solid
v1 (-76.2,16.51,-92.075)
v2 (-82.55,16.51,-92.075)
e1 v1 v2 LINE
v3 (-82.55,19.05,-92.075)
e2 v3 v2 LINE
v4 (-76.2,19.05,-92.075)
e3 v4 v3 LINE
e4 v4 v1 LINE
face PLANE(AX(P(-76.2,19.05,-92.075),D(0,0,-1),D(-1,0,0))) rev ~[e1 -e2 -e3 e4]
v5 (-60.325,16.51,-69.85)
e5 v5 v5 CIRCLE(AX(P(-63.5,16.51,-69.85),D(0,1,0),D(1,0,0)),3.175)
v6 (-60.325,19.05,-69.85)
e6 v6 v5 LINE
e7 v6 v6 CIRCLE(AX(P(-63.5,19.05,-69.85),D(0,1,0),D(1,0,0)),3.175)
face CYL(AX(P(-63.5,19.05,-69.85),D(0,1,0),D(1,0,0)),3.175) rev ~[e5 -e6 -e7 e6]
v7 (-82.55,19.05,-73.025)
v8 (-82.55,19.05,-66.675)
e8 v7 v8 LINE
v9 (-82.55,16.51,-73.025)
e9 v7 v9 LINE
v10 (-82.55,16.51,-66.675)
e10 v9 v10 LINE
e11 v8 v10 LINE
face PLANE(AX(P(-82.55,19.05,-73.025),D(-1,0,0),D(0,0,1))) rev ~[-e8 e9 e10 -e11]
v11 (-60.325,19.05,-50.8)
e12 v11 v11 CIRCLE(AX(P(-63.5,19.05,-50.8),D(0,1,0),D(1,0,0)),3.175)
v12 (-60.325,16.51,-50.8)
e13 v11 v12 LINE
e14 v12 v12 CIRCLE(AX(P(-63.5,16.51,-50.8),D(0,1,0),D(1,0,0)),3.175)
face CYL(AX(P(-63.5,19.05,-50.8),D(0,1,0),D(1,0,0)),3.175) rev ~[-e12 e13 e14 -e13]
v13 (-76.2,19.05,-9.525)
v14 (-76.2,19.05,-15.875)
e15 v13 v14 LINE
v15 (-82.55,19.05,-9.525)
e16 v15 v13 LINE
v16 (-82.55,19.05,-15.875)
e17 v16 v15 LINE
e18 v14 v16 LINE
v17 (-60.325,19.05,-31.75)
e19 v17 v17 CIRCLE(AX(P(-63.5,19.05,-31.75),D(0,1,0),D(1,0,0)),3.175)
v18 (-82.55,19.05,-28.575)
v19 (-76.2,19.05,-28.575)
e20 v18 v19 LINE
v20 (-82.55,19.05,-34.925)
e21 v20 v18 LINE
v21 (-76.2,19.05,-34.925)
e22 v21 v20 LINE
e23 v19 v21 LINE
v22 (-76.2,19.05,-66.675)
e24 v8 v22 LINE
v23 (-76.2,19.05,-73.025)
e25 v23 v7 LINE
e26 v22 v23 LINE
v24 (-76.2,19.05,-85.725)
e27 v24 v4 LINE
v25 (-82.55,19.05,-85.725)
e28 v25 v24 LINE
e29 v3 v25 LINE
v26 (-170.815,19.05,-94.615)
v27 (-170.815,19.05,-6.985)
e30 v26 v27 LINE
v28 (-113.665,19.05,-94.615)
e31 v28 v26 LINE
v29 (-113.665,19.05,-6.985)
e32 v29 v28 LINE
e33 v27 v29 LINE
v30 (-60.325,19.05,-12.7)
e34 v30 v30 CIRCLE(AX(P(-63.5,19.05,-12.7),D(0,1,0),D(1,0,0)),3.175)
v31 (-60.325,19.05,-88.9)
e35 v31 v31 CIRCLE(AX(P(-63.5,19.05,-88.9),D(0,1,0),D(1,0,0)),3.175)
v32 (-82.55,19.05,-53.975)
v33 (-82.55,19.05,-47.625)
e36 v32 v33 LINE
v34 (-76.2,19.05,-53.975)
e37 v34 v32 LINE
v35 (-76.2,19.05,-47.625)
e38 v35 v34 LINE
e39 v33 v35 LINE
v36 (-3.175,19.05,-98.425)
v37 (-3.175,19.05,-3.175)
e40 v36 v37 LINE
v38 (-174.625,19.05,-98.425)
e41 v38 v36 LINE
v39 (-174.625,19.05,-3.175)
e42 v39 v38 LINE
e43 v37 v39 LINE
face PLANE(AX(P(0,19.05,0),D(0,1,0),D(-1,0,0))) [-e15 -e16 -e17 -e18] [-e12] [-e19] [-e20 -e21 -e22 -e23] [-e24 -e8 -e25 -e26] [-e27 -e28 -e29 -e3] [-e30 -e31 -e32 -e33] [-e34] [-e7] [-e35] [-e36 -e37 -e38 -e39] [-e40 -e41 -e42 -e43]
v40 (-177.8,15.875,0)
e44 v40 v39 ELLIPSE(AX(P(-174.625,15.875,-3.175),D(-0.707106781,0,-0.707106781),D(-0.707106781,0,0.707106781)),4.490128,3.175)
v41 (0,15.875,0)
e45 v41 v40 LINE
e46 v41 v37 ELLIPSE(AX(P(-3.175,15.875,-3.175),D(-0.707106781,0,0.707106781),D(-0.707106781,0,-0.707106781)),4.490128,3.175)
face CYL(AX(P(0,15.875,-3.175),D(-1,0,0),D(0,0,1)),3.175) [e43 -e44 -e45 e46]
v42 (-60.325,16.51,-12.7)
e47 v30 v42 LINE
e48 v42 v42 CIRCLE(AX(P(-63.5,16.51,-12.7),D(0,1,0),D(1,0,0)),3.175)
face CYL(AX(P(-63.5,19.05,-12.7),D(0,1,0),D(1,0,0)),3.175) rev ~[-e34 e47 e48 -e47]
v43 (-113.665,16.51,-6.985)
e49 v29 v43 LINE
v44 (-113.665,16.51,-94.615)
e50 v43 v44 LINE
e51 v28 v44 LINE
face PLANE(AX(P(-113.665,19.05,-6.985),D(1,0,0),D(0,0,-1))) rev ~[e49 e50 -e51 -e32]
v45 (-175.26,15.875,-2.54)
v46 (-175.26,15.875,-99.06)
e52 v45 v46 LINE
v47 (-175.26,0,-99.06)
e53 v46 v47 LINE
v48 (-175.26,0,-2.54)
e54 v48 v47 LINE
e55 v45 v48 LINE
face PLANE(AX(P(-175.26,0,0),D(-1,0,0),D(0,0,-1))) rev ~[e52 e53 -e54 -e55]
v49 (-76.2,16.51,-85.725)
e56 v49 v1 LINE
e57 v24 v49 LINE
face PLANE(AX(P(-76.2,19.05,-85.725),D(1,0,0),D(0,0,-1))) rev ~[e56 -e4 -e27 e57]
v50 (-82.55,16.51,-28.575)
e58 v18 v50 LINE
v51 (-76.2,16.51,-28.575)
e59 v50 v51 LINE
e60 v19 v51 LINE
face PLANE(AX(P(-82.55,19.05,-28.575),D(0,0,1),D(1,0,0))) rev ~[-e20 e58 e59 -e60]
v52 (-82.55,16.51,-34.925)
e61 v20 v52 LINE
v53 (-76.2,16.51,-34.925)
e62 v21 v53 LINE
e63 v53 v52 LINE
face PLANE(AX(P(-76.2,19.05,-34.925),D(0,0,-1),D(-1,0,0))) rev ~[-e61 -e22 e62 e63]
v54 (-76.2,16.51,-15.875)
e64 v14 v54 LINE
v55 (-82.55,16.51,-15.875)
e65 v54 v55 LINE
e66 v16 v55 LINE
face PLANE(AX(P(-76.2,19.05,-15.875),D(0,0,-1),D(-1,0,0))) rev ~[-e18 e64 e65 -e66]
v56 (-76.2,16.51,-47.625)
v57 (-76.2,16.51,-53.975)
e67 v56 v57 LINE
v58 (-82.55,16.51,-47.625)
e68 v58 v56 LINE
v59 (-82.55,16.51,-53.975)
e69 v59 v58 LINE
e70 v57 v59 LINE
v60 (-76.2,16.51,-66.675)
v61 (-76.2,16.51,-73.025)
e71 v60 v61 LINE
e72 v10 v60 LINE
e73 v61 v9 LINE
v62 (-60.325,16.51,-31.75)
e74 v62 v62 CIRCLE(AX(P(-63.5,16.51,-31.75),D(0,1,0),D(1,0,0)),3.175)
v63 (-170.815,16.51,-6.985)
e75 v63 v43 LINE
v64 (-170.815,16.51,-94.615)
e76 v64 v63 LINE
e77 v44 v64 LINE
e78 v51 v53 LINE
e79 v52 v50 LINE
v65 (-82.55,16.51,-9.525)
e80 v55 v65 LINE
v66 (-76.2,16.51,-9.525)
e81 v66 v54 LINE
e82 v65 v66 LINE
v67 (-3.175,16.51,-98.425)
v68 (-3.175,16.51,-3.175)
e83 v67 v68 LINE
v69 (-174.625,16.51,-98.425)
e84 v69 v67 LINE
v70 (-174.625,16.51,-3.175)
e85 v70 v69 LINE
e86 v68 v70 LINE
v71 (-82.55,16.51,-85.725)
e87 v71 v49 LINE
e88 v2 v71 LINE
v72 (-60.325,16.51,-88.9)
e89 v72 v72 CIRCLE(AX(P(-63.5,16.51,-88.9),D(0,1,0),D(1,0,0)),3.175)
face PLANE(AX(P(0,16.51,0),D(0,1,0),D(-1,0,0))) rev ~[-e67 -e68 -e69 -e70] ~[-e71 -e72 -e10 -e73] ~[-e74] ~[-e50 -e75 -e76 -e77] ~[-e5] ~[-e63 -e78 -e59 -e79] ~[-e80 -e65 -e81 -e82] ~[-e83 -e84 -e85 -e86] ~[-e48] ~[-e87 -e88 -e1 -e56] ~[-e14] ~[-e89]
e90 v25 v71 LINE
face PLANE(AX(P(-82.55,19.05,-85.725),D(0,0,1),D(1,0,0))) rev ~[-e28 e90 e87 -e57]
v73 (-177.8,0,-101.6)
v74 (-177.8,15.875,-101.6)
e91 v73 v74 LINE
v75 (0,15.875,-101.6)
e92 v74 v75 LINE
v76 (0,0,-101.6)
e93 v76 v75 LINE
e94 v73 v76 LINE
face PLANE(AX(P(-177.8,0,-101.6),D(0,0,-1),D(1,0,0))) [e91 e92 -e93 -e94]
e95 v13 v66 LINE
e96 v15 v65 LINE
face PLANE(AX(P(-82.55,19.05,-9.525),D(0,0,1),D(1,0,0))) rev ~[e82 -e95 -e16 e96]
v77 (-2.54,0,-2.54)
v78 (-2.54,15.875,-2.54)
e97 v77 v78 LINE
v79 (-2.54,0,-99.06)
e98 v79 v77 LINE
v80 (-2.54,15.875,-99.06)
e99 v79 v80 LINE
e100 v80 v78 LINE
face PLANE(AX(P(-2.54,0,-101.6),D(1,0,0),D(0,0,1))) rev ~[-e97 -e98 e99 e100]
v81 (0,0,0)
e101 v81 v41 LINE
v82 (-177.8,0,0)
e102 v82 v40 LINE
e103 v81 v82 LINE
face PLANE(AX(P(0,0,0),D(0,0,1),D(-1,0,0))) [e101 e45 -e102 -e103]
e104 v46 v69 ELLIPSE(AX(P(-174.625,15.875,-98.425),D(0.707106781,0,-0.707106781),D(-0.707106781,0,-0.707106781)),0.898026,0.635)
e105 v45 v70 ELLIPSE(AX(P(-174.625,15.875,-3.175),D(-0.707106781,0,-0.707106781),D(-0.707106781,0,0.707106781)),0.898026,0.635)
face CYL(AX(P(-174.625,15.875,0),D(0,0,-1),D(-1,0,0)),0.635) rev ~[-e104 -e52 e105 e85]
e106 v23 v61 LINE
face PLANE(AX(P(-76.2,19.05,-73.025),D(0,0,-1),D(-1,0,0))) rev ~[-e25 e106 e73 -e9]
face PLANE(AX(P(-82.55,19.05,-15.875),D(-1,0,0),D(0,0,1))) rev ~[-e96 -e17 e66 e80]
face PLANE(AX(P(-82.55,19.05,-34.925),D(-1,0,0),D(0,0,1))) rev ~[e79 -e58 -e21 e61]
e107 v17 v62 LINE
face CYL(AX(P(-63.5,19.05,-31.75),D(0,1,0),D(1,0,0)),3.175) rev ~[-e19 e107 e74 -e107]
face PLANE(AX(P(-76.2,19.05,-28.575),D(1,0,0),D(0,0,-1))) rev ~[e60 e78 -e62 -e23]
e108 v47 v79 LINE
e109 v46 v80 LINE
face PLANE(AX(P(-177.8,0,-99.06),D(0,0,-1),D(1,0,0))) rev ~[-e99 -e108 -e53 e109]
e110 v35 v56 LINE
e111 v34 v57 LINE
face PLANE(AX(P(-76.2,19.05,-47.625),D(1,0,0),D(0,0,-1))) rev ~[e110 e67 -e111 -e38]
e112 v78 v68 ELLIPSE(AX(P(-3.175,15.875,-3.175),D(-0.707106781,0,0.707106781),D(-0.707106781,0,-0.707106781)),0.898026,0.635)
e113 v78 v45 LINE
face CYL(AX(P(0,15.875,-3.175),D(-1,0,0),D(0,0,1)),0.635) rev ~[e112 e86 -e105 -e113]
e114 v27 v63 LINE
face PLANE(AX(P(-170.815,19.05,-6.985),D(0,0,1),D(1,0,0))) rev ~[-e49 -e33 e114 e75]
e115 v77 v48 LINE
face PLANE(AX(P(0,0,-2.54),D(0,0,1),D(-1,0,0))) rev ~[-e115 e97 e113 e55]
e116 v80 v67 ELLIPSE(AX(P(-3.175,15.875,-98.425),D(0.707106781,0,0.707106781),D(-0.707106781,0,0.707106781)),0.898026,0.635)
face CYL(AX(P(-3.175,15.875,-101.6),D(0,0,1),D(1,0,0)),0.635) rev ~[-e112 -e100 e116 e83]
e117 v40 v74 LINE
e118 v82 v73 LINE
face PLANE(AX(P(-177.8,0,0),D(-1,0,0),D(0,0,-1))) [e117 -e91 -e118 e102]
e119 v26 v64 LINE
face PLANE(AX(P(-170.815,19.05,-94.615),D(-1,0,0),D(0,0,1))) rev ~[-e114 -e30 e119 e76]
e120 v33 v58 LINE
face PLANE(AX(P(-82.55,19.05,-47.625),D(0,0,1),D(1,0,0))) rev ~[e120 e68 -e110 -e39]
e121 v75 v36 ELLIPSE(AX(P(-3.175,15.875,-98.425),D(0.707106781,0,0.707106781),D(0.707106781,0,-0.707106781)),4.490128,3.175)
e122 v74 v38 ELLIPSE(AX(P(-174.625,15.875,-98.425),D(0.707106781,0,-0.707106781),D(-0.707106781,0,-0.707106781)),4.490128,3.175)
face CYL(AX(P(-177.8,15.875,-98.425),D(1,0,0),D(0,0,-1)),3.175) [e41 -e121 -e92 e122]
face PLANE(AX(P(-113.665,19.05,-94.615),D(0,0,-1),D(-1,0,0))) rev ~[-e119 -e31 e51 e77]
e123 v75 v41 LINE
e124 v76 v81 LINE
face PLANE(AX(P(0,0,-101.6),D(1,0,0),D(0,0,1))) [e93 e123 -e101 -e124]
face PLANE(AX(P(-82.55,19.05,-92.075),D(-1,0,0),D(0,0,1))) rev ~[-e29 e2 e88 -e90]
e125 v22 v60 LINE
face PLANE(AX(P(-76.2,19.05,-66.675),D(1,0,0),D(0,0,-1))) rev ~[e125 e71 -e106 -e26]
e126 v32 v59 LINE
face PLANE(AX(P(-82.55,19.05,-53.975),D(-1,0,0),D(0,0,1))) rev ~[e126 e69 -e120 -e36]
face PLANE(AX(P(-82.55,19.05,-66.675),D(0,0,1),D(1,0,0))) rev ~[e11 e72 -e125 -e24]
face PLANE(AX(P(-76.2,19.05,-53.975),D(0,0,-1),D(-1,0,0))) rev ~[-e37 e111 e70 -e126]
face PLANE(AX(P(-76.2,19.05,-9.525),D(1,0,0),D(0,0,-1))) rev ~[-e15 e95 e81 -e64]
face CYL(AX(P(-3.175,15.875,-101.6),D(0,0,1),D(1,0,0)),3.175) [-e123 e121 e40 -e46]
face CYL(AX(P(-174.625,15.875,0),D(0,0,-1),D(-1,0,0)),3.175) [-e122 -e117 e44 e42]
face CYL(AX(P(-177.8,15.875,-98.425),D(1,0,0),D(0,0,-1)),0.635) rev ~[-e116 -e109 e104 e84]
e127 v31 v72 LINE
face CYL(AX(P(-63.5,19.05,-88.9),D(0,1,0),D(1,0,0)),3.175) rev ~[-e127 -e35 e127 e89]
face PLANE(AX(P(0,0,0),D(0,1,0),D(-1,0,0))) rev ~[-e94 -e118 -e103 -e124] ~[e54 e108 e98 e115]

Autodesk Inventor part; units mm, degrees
ref_plane "YZ Plane" through (0, 0, 0) normal (1, 0, 0) x (0, 1, 0)
ref_plane "XZ Plane" through (0, 0, 0) normal (0, 1, 0) x (-1, 0, 0)
ref_plane "XY Plane" through (0, 0, 0) normal (0, 0, 1) x (1, 0, 0)
sketch "Sketch1" plane through (0, 0, 0) normal (0, 1, 0) x (-1, 0, 0)
  line L0 (0, 0) -> (177.8, 0)
  line L1 (177.8, 0) -> (177.8, -101.6)
  line L2 (177.8, -101.6) -> (0, -101.6)
  line L3 (0, -101.6) -> (0, 0)
  point P0 (177.8, -50.8)
  point P1 (88.9, 0)
  point P2 (0, -50.8)
  dimension "d0" = 177.8
  dimension "d1" = 101.6
extrude "Extrusion1" add sketch "Sketch1" along normal blind 19.05
fillet "Fillet1" radius 3.175 4 edges at (-88.9, 19.05, 0) (-177.8, 19.05, -50.8) (-88.9, 19.05, -101.6) (0, 19.05, -50.8)
sketch "Sketch2" plane through (0, 19.05, 0) normal (0, 1, 0) x (1, 0, 0)
  line L0 (-170.815, 6.985) -> (-113.665, 6.985)
  line L1 (-113.665, 6.985) -> (-113.665, 94.615)
  line L2 (-113.665, 94.615) -> (-170.815, 94.615)
  line L3 (-170.815, 94.615) -> (-170.815, 6.985)
  line L4 (-177.8, 0) -> (0, 0) projected
  line L5 (-177.8, 101.6) -> (-177.8, 0) projected
  line L6 (-82.55, 9.525) -> (-76.2, 9.525)
  line L7 (-76.2, 9.525) -> (-76.2, 15.875)
  line L8 (-76.2, 15.875) -> (-82.55, 15.875)
  line L9 (-82.55, 15.875) -> (-82.55, 9.525)
  line L10 (0, 0) -> (0, 101.6) projected
  line L11 (-82.55, 28.575) -> (-76.2, 28.575)
  line L12 (-76.2, 28.575) -> (-76.2, 34.925)
  line L13 (-76.2, 34.925) -> (-82.55, 34.925)
  line L14 (-82.55, 34.925) -> (-82.55, 28.575)
  line L15 (-82.55, 47.625) -> (-76.2, 47.625)
  line L16 (-76.2, 47.625) -> (-76.2, 53.975)
  line L17 (-76.2, 53.975) -> (-82.55, 53.975)
  line L18 (-82.55, 53.975) -> (-82.55, 47.625)
  line L19 (-82.55, 66.675) -> (-76.2, 66.675)
  line L20 (-76.2, 66.675) -> (-76.2, 73.025)
  line L21 (-76.2, 73.025) -> (-82.55, 73.025)
  line L22 (-82.55, 73.025) -> (-82.55, 66.675)
  line L23 (-82.55, 85.725) -> (-76.2, 85.725)
  line L24 (-76.2, 85.725) -> (-76.2, 92.075)
  line L25 (-76.2, 92.075) -> (-82.55, 92.075)
  line L26 (-82.55, 92.075) -> (-82.55, 85.725)
  circle A0 centre (-63.5, 12.7) radius 3.175
  circle A1 centre (-63.5, 31.75) radius 3.175
  circle A2 centre (-63.5, 50.8) radius 3.175
  circle A3 centre (-63.5, 69.85) radius 3.175
  circle A4 centre (-63.5, 88.9) radius 3.175
  line L27 (0, 101.6) -> (-177.8, 101.6) projected
  point P0 (-79.375, 15.875)
  point P1 (-79.375, 28.575)
  point P2 (-79.375, 34.925)
  point P3 (-79.375, 47.625)
  dimension "d47" = 87.63
  dimension "d48" = 57.15
  dimension "d49" = 6.985
  dimension "d50" = 6.985
  dimension "d51" = 6.35
  dimension "d52" = 6.35
  dimension "d53" = 9.525
  dimension "d54" = 76.2
  dimension "d55" = 6.35
  dimension "d56" = 6.35
  dimension "d57" = 6.35
  dimension "d58" = 6.35
  dimension "d59" = 6.35
  dimension "d60" = 6.35
  dimension "d61" = 6.35
  dimension "d62" = 6.35
  dimension "d63" = 12.7
  dimension "d64" = 12.7
  dimension "d65" = 12.7
  dimension "d66" = 12.7
  dimension "d67" = 76.2
  dimension "d68" = 6.35
  dimension "d69" = 6.35
  dimension "d70" = 6.35
  dimension "d71" = 6.35
  dimension "d72" = 6.35
  dimension "d73" = 63.5
  dimension "d74" = 63.5
  dimension "d75" = 63.5
  dimension "d76" = 63.5
  dimension "d77" = 63.5
  dimension "d78" = 12.7
  dimension "d79" = 19.05
  dimension "d80" = 19.05
  dimension "d81" = 19.05
  dimension "d82" = 19.05
shell "Shell2" thickness 2.54 removed faces 1 at (-59.2667, 0, -33.8667)
extrude "Extrusion2" cut sketch "Sketch2" against normal blind 19.05 contours L3 L2 L1 L0 | L9 L8 L7 L6 | L14 L13 L12 L11 | L18 L17 L16 L15 | L22 L21 L20 L19 | L26 L25 L24 L23 | A0 | A1 | A2 | A3 | A4
properties part number "CaseTop" material "PC/ABS Plastic"
